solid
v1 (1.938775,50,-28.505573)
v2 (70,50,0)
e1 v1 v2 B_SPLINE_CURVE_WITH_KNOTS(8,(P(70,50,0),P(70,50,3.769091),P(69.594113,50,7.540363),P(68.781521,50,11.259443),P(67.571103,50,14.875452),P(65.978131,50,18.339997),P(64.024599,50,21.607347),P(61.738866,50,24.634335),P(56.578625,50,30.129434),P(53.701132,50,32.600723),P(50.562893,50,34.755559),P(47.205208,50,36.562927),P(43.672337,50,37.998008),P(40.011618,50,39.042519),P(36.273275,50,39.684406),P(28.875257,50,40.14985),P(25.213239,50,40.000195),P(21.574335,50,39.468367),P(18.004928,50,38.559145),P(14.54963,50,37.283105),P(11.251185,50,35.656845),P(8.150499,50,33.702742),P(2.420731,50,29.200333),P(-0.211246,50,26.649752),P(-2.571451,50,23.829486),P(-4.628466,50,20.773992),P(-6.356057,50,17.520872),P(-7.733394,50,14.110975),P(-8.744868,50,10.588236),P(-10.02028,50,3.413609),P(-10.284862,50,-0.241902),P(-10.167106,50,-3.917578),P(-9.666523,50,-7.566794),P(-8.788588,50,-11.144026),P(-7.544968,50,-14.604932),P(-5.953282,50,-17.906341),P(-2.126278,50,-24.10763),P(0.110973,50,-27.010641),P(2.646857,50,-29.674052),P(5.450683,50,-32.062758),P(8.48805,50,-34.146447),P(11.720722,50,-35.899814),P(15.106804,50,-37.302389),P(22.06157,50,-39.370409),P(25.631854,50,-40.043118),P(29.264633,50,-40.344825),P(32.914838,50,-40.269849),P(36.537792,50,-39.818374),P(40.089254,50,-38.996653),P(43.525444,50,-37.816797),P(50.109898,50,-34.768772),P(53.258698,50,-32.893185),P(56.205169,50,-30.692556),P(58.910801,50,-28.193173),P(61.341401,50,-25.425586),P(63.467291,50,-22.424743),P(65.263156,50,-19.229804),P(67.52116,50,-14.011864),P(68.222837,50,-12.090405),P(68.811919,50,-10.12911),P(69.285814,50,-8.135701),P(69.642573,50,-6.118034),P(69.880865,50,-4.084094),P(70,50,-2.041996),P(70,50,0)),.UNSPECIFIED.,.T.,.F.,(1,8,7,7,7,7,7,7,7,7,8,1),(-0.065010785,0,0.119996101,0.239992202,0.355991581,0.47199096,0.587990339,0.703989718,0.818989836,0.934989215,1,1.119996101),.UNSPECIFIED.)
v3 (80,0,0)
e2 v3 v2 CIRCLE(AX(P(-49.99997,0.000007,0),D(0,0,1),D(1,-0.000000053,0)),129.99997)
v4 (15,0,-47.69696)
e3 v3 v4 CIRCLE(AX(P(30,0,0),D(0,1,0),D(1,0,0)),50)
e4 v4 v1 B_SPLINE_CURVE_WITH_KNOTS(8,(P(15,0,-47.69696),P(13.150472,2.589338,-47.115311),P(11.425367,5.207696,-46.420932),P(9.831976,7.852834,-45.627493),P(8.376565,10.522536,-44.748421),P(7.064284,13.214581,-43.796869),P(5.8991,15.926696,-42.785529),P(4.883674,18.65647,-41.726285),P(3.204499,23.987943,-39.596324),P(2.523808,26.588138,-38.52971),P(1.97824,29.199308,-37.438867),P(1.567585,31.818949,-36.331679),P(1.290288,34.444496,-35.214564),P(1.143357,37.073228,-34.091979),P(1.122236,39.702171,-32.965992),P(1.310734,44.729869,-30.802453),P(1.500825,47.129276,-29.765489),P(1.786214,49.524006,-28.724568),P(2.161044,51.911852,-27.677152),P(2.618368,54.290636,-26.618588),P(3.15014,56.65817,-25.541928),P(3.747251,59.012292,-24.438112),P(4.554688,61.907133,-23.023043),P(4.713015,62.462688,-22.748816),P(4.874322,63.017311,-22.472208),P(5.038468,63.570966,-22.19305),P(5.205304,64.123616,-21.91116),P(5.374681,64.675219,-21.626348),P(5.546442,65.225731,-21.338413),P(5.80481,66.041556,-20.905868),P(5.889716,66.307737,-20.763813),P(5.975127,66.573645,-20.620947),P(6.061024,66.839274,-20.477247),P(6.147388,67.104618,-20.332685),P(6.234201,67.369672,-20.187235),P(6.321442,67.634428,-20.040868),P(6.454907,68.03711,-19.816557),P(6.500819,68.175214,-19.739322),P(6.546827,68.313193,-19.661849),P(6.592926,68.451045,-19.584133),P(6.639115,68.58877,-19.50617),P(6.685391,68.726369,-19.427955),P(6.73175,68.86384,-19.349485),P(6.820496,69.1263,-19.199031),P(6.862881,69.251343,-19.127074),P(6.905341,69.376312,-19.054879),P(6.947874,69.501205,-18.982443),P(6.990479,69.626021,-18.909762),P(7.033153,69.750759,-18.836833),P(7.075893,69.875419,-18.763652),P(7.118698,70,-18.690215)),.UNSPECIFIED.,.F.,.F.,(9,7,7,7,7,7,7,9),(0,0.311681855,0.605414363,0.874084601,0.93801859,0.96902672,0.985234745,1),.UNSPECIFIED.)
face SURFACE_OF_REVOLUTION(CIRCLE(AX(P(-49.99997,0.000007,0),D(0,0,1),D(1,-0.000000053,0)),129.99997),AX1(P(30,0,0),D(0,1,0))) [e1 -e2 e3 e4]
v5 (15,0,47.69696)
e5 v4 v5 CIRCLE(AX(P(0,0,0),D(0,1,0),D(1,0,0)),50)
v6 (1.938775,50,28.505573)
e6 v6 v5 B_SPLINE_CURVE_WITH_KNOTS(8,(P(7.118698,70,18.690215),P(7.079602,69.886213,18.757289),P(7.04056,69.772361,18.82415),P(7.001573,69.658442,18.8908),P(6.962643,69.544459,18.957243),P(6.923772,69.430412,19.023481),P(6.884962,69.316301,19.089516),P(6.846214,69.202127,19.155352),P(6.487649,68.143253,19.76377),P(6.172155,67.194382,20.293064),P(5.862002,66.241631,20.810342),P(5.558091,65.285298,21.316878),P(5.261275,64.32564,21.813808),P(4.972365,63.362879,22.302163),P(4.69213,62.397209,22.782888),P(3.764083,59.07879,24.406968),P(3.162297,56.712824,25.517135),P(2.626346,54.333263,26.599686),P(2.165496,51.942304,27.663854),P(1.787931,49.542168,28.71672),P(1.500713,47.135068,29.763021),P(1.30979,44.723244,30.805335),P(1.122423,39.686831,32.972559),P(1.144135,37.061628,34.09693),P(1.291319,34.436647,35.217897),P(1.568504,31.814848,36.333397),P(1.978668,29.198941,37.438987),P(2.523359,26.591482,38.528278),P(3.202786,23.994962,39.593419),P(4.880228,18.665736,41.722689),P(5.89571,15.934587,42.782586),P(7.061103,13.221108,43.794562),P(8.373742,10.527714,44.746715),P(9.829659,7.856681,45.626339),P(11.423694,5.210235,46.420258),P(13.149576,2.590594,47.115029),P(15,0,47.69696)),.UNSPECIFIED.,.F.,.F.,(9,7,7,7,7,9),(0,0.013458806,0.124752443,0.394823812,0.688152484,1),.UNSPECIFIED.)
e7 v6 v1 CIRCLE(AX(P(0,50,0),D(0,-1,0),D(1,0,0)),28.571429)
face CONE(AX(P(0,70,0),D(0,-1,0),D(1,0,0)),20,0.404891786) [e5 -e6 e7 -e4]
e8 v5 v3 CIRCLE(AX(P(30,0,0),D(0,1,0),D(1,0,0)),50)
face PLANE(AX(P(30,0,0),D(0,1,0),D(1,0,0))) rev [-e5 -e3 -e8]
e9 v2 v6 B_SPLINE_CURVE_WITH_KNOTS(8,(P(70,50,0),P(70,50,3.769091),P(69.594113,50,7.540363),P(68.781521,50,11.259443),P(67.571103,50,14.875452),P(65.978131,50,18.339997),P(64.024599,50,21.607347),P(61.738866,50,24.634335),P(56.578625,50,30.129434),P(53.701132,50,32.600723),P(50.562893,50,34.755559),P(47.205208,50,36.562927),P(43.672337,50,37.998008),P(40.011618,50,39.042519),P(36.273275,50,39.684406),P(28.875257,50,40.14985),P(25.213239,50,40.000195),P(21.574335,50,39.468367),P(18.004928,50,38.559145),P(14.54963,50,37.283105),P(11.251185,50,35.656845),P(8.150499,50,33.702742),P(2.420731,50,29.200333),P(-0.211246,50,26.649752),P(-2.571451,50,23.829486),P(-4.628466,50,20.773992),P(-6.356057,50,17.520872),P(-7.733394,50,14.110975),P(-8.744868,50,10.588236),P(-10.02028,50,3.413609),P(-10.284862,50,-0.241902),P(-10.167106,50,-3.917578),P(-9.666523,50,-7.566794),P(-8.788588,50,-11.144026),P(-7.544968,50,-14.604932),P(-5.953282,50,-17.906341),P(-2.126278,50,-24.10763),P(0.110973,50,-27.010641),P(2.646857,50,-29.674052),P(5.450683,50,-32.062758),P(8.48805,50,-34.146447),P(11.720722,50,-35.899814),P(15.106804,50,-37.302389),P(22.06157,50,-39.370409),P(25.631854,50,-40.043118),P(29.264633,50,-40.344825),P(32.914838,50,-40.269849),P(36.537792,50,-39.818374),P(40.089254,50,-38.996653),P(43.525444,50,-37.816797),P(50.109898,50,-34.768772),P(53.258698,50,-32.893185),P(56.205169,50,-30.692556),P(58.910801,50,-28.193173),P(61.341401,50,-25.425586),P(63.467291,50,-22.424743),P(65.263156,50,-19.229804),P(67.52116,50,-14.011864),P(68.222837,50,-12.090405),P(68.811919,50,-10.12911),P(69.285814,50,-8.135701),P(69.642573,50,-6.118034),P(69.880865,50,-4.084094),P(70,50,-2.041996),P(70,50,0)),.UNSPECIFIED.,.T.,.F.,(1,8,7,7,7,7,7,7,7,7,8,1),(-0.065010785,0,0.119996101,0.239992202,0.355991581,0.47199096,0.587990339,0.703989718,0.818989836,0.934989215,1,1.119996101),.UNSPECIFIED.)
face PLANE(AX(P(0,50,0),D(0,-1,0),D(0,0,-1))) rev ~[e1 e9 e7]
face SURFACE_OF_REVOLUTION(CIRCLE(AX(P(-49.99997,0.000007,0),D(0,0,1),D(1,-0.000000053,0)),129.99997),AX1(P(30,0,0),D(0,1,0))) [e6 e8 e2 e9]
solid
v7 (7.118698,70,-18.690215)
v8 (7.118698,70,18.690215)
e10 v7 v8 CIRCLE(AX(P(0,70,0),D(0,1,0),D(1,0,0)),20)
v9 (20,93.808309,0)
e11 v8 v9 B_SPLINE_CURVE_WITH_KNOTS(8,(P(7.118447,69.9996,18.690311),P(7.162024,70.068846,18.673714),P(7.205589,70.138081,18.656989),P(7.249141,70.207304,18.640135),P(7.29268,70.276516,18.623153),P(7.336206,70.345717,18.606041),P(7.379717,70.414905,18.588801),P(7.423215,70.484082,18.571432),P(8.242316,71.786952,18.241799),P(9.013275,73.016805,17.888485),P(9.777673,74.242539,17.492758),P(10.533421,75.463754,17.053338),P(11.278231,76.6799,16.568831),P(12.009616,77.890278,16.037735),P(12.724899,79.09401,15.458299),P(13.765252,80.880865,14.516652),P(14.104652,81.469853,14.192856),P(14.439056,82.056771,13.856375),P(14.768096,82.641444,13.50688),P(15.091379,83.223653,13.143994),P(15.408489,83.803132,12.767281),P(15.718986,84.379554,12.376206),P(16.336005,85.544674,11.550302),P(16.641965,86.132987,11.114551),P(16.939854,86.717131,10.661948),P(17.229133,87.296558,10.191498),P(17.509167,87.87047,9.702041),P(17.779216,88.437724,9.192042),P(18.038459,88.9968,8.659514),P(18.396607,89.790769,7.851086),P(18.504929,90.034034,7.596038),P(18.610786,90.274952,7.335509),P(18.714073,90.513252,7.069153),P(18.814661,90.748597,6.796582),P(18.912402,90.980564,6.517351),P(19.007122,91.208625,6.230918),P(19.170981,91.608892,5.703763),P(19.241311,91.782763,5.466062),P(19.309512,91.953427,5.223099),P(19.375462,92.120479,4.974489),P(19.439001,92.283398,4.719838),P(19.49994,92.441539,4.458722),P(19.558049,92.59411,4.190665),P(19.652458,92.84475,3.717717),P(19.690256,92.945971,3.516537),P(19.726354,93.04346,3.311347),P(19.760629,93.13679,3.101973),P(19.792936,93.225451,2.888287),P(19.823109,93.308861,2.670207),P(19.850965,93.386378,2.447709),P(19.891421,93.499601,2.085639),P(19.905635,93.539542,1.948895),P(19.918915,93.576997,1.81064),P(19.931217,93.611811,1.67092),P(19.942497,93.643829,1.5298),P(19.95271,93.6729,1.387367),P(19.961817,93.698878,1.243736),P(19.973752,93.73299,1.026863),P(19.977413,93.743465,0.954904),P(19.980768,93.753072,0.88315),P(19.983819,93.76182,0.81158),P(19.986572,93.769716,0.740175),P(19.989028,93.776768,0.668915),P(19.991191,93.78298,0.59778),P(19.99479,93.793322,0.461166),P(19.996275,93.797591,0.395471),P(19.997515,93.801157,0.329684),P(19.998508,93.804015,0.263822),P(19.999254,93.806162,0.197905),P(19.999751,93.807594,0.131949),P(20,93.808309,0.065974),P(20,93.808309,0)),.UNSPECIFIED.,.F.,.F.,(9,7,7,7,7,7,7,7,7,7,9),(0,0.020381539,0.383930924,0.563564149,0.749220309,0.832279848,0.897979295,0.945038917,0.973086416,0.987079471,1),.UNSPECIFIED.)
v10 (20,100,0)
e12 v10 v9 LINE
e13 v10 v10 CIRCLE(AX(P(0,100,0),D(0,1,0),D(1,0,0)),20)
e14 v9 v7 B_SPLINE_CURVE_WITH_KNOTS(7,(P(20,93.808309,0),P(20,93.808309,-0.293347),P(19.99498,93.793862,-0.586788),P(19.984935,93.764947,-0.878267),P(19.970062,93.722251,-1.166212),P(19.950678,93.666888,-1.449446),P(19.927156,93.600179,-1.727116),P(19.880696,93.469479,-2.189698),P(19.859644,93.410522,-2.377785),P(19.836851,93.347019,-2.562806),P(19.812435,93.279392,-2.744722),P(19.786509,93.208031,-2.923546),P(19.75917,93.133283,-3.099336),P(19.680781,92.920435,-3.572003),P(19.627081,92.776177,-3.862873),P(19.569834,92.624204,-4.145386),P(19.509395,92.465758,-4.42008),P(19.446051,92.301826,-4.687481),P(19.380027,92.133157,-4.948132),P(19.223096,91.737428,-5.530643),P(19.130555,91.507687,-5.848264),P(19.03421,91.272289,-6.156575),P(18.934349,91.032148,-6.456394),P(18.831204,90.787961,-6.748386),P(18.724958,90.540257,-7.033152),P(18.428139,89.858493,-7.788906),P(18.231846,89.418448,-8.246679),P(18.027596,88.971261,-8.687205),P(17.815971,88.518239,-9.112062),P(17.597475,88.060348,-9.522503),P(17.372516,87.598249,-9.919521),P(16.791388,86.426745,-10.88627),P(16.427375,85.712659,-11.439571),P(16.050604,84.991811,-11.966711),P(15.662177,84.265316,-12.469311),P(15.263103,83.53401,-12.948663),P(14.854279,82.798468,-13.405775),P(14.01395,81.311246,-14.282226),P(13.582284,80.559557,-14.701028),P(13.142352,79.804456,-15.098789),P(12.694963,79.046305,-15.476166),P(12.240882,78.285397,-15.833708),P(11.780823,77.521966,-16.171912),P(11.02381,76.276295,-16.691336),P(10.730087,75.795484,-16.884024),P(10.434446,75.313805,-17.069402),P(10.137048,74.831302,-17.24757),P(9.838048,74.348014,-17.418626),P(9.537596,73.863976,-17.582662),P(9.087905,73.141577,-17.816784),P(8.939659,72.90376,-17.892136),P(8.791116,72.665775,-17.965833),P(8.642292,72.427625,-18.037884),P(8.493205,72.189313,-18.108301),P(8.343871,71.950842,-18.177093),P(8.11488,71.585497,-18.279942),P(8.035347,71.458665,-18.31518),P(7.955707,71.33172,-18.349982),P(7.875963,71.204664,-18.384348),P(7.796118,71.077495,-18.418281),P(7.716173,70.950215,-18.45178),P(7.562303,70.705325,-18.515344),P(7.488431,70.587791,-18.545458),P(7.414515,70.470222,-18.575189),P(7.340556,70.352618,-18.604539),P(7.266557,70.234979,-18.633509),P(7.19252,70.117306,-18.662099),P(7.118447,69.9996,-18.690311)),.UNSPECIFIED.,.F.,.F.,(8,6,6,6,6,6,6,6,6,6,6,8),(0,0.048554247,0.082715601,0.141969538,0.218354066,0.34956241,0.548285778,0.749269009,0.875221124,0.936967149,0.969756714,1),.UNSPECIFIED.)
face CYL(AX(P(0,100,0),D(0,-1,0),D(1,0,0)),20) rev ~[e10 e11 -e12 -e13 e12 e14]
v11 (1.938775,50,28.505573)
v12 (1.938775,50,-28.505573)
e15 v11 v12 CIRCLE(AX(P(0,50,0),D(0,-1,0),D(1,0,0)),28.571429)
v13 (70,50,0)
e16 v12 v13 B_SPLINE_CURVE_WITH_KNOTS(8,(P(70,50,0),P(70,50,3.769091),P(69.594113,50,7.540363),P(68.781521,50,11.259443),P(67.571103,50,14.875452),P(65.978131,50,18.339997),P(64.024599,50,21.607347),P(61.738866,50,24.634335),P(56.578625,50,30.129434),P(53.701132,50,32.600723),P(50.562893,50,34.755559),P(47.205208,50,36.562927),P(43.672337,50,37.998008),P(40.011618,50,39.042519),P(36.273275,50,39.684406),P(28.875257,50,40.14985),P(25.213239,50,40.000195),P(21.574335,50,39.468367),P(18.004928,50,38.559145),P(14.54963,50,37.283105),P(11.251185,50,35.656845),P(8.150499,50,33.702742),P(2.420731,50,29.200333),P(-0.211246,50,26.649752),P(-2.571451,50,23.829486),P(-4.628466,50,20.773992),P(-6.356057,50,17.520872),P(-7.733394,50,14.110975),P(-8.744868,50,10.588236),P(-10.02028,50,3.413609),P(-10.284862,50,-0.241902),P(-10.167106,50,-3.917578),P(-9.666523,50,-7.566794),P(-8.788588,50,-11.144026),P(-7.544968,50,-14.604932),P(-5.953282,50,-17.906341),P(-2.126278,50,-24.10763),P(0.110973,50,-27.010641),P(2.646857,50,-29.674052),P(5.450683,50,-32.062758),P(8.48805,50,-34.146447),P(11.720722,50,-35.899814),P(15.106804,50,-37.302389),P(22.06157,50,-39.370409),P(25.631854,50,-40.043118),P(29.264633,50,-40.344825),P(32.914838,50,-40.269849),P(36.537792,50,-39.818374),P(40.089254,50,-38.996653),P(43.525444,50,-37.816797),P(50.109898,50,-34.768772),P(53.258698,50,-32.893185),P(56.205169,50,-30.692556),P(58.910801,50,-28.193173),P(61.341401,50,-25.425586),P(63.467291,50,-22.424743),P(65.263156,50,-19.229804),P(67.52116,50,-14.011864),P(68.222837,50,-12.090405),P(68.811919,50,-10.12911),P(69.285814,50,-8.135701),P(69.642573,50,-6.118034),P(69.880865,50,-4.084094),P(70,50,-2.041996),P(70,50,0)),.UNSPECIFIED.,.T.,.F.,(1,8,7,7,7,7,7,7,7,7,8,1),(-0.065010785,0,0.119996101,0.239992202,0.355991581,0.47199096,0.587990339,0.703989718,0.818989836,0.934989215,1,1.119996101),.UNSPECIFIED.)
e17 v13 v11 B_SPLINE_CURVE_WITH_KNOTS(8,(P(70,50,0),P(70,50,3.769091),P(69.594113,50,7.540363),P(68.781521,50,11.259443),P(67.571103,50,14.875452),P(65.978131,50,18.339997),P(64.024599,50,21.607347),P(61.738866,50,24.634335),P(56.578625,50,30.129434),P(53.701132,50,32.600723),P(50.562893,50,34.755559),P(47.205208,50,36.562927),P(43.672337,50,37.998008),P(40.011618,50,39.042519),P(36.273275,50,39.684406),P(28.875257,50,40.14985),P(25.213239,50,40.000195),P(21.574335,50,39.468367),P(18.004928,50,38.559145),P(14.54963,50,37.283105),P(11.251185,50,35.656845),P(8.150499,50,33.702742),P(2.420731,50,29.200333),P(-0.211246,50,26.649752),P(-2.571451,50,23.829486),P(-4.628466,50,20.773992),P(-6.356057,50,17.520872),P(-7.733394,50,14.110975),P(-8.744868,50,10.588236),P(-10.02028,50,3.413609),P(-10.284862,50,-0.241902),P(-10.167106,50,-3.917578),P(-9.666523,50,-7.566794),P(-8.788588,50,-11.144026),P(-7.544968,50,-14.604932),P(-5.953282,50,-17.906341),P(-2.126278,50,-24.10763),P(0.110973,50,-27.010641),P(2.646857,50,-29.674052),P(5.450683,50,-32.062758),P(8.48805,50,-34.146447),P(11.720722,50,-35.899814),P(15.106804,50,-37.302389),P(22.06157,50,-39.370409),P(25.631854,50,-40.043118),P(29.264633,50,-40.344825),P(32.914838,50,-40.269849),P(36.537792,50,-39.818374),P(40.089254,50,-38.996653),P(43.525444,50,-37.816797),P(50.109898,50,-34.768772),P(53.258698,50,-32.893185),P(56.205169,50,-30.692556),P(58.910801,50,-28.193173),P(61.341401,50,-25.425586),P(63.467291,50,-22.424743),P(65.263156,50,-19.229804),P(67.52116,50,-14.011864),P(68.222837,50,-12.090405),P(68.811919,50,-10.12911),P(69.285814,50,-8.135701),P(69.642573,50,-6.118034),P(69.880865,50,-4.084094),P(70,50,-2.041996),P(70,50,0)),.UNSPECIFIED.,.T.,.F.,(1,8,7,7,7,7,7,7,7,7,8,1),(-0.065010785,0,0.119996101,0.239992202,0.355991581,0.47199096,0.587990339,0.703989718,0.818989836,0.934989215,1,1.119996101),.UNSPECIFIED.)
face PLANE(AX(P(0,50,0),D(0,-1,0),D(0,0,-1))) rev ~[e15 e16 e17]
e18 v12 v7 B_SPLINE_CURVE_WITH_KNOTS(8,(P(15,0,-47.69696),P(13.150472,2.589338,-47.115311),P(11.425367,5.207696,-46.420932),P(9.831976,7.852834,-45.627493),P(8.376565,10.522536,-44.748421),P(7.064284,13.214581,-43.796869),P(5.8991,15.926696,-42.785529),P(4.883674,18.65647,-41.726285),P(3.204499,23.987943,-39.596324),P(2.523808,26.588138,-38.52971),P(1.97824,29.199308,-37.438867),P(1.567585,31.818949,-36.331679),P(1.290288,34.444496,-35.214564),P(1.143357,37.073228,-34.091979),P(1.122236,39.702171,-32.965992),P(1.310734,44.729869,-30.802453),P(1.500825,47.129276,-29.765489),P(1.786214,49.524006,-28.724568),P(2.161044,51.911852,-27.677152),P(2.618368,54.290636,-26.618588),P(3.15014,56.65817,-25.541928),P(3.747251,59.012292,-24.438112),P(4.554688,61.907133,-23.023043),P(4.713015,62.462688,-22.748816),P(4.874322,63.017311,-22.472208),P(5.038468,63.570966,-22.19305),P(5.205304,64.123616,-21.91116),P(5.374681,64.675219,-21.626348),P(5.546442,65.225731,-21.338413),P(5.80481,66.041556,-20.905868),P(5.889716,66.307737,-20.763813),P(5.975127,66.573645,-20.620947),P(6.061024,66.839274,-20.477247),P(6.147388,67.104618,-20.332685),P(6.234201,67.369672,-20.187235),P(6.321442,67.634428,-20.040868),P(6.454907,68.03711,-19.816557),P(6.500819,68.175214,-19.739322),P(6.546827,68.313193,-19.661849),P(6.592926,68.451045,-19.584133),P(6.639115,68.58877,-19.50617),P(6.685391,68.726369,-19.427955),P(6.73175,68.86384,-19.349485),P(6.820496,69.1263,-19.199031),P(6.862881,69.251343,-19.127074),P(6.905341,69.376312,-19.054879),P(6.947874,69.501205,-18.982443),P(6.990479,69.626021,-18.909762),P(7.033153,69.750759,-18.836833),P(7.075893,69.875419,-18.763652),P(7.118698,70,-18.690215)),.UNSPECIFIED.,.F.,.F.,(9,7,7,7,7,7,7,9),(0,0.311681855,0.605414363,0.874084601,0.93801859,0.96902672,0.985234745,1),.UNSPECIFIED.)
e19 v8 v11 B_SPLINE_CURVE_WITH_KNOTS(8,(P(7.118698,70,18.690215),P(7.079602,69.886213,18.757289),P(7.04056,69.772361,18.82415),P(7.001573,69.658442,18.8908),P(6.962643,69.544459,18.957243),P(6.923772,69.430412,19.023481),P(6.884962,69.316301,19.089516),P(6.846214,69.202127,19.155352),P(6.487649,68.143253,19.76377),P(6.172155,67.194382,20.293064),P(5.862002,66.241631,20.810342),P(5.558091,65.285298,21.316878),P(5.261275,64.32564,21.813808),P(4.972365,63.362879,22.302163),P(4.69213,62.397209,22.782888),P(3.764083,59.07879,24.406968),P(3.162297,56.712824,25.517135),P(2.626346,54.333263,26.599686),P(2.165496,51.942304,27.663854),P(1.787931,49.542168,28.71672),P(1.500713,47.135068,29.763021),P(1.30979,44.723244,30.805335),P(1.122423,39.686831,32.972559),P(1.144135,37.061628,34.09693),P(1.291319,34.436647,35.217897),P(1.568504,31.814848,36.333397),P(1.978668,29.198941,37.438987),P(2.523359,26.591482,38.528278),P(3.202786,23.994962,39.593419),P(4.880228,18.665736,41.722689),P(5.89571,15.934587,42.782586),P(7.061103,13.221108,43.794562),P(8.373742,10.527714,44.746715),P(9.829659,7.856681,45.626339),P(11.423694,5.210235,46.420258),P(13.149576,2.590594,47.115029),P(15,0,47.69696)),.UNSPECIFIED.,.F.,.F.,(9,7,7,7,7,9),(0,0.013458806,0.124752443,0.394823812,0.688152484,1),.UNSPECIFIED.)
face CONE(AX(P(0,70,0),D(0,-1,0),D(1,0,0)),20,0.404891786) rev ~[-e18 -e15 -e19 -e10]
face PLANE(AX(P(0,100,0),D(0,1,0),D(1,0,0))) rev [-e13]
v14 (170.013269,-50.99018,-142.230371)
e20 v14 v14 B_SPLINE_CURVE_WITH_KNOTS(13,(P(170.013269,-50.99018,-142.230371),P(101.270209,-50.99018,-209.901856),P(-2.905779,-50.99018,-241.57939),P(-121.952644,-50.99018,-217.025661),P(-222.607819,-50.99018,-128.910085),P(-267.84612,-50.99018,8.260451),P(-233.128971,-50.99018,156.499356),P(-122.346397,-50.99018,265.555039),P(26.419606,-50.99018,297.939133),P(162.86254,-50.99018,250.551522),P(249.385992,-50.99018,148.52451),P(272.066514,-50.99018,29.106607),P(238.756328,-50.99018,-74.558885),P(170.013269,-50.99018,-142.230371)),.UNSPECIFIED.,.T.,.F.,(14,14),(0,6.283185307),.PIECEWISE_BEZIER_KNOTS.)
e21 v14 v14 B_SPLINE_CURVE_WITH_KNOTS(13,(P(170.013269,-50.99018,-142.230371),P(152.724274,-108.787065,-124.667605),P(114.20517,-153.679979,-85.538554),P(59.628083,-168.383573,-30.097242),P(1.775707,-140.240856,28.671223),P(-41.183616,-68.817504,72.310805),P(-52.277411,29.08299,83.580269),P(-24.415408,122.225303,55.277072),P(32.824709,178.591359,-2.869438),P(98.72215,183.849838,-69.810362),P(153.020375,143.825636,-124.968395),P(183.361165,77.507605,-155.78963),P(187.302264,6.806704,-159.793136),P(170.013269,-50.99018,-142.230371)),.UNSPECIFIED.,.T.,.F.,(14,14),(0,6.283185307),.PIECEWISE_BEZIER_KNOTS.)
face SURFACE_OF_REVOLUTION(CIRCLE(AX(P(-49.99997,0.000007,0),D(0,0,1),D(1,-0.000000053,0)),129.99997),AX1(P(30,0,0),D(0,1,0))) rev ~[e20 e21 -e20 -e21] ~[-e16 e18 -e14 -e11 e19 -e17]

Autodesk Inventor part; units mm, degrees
ref_plane "YZ Plane" through (0, 0, 0) normal (1, 0, 0) x (0, 1, 0)
ref_plane "XZ Plane" through (0, 0, 0) normal (0, 1, 0) x (-1, 0, 0)
ref_plane "XY Plane" through (0, 0, 0) normal (0, 0, 1) x (1, 0, 0)
sketch "Эскиз1" plane through (0, 0, 0) normal (0, 0, 1) x (1, 0, 0)
  line L0 (0, 0) -> (50, 0)
  line L1 (0, 0) -> (0, 100)
  line L2 (0, 100) -> (20, 100)
  line L3 (20, 100) -> (20, 70)
  line L4 (20, 70) -> (50, 0)
  dimension "d0" = 50
  dimension "d1" = 100
  dimension "d2" = 20
  dimension "d3" = 30
revolve "Вращение1" add sketch "Эскиз1" angle 360 about axis through (0, 0, 0) along (0, 1, 0)
sketch "Эскиз2" plane through (0, 0, 0) normal (0, 0, 1) x (1, 0, 0)
  line L0 (50, 0) -> (-50, 0) projected
  line L1 (30, 0) -> (80, 0)
  arc A0 (80, 0) -> (30, 102.4695) centre (-50, 0) ccw
  line L2 (30, 0) -> (30, 102.4695)
  point P0 (0, 0)
  dimension "d6" = 50
revolve "Вращение2" add sketch "Эскиз2" angle 360 about axis through (30, 0, 0) along (0, 1, 0)
sketch "Эскиз3" plane through (0, 0, 0) normal (0, 1, 0) x (-1, 0, 0)
  point P0 (0, 0)
ref_plane "РабПлоскость1" through (0, 50, 0) normal (0, -1, 0) x (1, 0, 0)
split body "Разделение1" result two bodies by plane through (0, 50, 0) normal (0, -1, 0) first body at (35.2447, 0.5, -10.7096)
properties part number "Пример1"
